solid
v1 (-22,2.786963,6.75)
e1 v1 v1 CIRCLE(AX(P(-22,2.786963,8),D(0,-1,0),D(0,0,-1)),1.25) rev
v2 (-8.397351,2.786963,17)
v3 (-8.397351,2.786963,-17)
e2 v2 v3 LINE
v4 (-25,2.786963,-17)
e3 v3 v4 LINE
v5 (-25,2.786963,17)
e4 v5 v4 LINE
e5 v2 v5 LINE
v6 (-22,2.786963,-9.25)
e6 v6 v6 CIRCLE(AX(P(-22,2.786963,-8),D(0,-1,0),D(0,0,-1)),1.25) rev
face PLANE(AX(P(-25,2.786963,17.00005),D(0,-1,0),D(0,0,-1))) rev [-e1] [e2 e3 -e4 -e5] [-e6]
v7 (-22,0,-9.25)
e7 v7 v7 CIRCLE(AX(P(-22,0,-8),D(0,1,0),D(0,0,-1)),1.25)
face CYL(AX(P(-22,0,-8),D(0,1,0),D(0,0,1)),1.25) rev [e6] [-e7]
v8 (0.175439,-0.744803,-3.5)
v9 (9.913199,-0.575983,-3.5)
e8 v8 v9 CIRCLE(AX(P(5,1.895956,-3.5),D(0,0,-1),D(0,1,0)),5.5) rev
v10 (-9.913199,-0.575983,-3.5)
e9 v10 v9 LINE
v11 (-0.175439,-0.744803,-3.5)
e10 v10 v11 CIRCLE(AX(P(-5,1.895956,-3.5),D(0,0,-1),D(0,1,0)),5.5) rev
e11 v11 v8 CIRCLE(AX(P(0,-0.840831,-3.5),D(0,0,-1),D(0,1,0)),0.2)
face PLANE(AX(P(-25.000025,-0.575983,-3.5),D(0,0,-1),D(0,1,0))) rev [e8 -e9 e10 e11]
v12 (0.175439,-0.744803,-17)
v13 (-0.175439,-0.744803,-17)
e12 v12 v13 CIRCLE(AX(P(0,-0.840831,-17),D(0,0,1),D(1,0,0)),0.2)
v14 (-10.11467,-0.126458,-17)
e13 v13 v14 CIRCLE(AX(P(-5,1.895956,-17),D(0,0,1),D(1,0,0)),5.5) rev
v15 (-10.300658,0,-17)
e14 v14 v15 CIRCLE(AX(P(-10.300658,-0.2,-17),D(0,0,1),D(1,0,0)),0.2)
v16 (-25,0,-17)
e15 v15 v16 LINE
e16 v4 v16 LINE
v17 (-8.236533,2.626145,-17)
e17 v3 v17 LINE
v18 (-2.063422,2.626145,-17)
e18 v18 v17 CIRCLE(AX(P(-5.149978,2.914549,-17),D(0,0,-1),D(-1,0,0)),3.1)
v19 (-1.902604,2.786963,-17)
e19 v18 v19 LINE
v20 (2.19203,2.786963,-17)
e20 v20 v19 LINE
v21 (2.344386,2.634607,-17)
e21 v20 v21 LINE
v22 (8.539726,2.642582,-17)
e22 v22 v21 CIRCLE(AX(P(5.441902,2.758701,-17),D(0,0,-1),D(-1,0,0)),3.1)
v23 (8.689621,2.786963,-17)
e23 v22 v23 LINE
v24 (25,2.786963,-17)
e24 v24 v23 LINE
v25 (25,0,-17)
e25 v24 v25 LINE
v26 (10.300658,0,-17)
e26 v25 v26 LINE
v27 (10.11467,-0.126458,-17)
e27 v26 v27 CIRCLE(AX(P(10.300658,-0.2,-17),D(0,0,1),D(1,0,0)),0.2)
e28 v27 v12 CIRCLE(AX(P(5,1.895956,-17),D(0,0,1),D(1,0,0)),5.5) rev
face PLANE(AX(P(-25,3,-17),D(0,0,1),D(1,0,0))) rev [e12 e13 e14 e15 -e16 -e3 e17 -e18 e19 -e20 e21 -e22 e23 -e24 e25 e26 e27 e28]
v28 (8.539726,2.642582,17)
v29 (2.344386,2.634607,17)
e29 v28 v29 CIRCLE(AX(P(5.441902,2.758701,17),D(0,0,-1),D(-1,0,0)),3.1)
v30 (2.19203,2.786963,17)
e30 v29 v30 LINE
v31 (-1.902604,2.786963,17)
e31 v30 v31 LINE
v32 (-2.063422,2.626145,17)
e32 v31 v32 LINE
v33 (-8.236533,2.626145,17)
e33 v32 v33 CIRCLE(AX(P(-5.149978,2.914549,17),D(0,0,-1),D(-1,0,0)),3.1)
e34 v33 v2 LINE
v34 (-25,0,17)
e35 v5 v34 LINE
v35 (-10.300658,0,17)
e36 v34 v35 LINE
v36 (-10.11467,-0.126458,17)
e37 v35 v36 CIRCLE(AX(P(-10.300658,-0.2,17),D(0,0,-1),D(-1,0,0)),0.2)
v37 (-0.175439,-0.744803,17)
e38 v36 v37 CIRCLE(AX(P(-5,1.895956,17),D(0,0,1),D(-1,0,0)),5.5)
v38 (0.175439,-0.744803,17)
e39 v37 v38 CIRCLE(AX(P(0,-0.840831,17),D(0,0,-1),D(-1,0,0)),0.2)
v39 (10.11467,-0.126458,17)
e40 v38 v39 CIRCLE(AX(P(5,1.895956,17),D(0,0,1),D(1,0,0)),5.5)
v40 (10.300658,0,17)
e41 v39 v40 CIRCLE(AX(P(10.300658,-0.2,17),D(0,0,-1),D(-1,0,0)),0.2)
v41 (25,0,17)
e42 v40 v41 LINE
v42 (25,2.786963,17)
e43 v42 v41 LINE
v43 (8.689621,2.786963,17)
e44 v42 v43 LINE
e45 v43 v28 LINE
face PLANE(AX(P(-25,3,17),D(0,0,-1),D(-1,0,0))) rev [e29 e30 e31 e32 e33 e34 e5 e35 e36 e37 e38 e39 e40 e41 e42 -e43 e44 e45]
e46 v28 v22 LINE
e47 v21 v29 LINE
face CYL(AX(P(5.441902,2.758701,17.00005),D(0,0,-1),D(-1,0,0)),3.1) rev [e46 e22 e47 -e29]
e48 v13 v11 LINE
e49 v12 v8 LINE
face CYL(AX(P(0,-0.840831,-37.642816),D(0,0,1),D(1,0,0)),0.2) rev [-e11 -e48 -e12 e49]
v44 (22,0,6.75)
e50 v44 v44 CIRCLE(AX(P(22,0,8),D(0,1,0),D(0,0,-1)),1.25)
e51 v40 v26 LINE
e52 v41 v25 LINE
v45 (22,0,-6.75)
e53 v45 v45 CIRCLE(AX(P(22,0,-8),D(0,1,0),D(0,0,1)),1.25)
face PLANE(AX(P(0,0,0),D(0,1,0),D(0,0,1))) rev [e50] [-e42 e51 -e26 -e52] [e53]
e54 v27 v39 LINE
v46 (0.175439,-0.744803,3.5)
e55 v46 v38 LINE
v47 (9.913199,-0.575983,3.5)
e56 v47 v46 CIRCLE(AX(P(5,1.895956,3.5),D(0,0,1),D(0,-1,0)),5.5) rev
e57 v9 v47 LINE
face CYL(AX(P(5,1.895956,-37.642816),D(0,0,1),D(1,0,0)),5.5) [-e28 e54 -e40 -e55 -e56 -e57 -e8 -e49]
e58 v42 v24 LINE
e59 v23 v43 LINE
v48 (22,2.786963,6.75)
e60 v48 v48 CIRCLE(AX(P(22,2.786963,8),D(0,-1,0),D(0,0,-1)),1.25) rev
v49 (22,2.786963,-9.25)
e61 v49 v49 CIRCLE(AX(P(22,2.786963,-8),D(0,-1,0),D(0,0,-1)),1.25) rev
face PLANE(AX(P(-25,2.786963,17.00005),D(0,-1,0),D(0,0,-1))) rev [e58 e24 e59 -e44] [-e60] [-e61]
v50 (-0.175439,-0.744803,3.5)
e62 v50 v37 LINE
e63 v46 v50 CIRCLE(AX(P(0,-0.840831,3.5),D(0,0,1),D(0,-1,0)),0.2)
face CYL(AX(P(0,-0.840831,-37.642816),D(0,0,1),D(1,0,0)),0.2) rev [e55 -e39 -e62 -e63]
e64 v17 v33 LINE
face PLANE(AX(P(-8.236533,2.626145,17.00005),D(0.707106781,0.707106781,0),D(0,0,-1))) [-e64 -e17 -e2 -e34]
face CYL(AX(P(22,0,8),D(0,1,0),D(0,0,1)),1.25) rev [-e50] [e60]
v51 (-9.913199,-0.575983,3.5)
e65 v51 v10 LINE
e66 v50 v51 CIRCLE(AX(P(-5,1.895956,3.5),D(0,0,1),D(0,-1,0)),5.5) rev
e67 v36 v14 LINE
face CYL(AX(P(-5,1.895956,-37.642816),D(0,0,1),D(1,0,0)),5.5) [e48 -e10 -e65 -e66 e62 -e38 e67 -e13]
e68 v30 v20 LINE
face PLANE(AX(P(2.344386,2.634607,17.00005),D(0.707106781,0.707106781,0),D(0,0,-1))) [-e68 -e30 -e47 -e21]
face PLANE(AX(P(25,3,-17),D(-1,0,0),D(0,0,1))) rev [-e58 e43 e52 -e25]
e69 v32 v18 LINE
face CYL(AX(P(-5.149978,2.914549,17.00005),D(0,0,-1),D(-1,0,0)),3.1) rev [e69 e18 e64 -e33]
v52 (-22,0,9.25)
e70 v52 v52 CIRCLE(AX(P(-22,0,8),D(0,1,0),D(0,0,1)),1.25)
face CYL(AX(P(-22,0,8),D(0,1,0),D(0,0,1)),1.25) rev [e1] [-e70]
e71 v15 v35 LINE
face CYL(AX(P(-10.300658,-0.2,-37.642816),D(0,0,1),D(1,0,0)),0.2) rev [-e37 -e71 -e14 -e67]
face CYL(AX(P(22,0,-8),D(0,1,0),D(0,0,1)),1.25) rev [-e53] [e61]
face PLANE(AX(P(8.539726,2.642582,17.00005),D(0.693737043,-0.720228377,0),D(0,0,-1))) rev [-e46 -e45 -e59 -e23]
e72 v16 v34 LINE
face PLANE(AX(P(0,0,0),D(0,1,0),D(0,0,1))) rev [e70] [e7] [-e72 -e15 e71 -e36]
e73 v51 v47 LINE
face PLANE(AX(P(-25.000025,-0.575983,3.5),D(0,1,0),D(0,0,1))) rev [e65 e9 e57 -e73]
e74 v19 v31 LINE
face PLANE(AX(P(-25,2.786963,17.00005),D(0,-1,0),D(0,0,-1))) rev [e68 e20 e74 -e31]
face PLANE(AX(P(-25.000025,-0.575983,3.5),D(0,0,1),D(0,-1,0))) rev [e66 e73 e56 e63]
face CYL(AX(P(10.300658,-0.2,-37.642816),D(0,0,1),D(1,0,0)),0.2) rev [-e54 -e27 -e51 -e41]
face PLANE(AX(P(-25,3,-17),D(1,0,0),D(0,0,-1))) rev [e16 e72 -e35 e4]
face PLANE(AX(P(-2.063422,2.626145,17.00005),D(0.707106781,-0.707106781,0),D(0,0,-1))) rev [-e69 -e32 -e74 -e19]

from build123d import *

# Parameters (mm, degrees)
SKETCH1_W           = 50
SKETCH1_H           = 34
BOSS_EXTRUDE1_DEPTH = 3
SKETCH2_W           = 38
SKETCH2_H           = 34
BOSS_EXTRUDE2_DEPTH = 3
SKETCH3_R           = 1.25
CUT_EXTRUDE1_DEPTH  = 3
BOSS_EXTRUDE3_DEPTH = 34
CUT_EXTRUDE4_DEPTH  = 43.626282972
SKETCH6_W           = 7
SKETCH6_H           = 4.004114793
CUT_EXTRUDE3_DEPTH  = 54.150729064
FILLET1_R           = 0.2
SKETCH8_W           = 4.910344877
SKETCH8_H           = 2.364797993
CUT_EXTRUDE5_DEPTH  = 43.626282972
FILLET2_R           = 0.5
SKETCH9_W           = 50
SKETCH9_H           = 6.499651724
CUT_EXTRUDE6_DEPTH  = 43.626282972
CHAMFER1_START      = -18
CHAMFER1_DEPTH      = 36


with BuildPart() as part:
    # Sketch1 → Boss-Extrude1 (new body)
    with BuildSketch(Plane(origin=(0, 0, 0), x_dir=(1, 0, 0), z_dir=(0, 1, 0))):
        Rectangle(SKETCH1_W, SKETCH1_H)
    extrude(amount=BOSS_EXTRUDE1_DEPTH)

    # Sketch2 → Boss-Extrude2 (add)
    with BuildSketch(Plane(origin=(0, 3, 0), x_dir=(1, 0, 0), z_dir=(0, 1, 0))):
        Rectangle(SKETCH2_W, SKETCH2_H)
    extrude(amount=BOSS_EXTRUDE2_DEPTH)

    # Sketch3 → Cut-Extrude1 (cut)
    with BuildSketch(Plane(origin=(0, 3, 0), x_dir=(1, 0, 0), z_dir=(0, 1, 0))):
        with Locations(Location((22, 8, 0), (0, 0, 270))):
            Circle(SKETCH3_R)
        with Locations(Location((22, -8, 0), (0, 0, 90))):
            Circle(SKETCH3_R)
        with Locations(Location((-22, -8, 0), (0, 0, 270))):
            Circle(SKETCH3_R)
        with Locations(Location((-22, 8, 0), (0, 0, 90))):
            Circle(SKETCH3_R)
    extrude(amount=-CUT_EXTRUDE1_DEPTH, mode=Mode.SUBTRACT)

    # Sketch5 → Boss-Extrude3 (add)
    with BuildSketch(Plane.XY.offset(17)):
        with BuildLine():
            Line((10.162882175, 0), (-10.162882175, 0))
            ThreePointArc((-10.162882175, 0), (-5.40902103, -3.588814383), (-0.175438596, -0.74480324))
            ThreePointArc((-0.175438596, -0.74480324), (0, -0.640830834), (0.175438596, -0.74480324))
            ThreePointArc((0.175438596, -0.74480324), (5.40902103, -3.588814383), (10.162882175, 0))
        make_face()
    extrude(amount=-BOSS_EXTRUDE3_DEPTH)

    # Sketch7 → Cut-Extrude4 (cut, through all)
    with BuildSketch(Plane(origin=(0, 0, -17), x_dir=(-1, 0, 0), z_dir=(0, 0, -1))):
        with BuildLine():
            Line((-8.541784002, 2.785692228), (-8.541784002, 8.770064047))
            Line((-8.541784002, 8.770064047), (8.249387021, 8.770064047))
            Line((8.249387021, 8.770064047), (8.249387021, 2.975059658))
            ThreePointArc((8.249387021, 2.975059658), (5.18491916, -0.185254174), (2.049991811, 2.905179016))
            Line((2.049991811, 2.905179016), (2.049991811, 5.195476311))
            Line((2.049991811, 5.195476311), (-2.343419325, 5.195476311))
            Line((-2.343419325, 5.195476311), (-2.343419325, 2.855696601))
            ThreePointArc((-2.343419325, 2.855696601), (-5.40689232, -0.341101373), (-8.541784002, 2.785692228))
        make_face()
    extrude(amount=-CUT_EXTRUDE4_DEPTH, mode=Mode.SUBTRACT)

    # Sketch6 → Cut-Extrude3 (cut, through all)
    with BuildSketch(Plane(origin=(25, 0, 0), x_dir=(0, 0, -1), z_dir=(1, 0, 0))):
        with Locations((0, -2.578040121)):
            Rectangle(SKETCH6_W, SKETCH6_H)
    extrude(amount=-CUT_EXTRUDE3_DEPTH, mode=Mode.SUBTRACT)

    # Fillet1
    fillet1_edges = [part.edges().sort_by_distance(p)[0] for p in [
        (10.162882175, 0, 0),
        (-10.162882175, 0, 0),
    ]]
    fillet(fillet1_edges, radius=FILLET1_R)

    # Sketch8 → Cut-Extrude5 (cut, through all)
    with BuildSketch(Plane(origin=(0, 0, -17), x_dir=(-1, 0, 0), z_dir=(0, 0, -1))):
        with Locations((-0.118869912, 4.00385134)):
            Rectangle(SKETCH8_W, SKETCH8_H)
    extrude(amount=-CUT_EXTRUDE5_DEPTH, mode=Mode.SUBTRACT)


with BuildPart() as cut_extrude5_kept_piece:
    # of the separate pieces the step leaves, the one the design keeps (cut_extrude5_pieces_kept)
    add(part.part.solids().sort_by_distance((-10.300657517, 0, -17))[0])

    # Fillet2
    fillet2_edges = [cut_extrude5_kept_piece.edges().sort_by_distance(p)[0] for p in [
        (8.541784002, 6, 0),
        (-8.249387021, 6, 0),
    ]]
    fillet(fillet2_edges, radius=FILLET2_R)

    # Sketch9 → Cut-Extrude6 (cut, through all)
    with BuildSketch(Plane(origin=(0, 0, -17), x_dir=(-1, 0, 0), z_dir=(0, 0, -1))):
        with Locations((0, 6.036788854)):
            Rectangle(SKETCH9_W, SKETCH9_H)
    extrude(amount=-CUT_EXTRUDE6_DEPTH, mode=Mode.SUBTRACT)

    # Chamfer1: read off the stored shape, not the designer's step
    # Chamfer1 outline → Chamfer1 (cut)
    with BuildSketch(Plane.XY.offset(CHAMFER1_START)):
        with BuildLine():
            ThreePointArc((8.541784002, 2.785692228), (8.541581007, 2.714125068), (8.539725958, 2.642581666))
            Line((8.539725958, 2.642581666), (8.689620689, 2.786962992))
            Line((8.689620689, 2.786962992), (8.541784002, 2.786962992))
            Line((8.541784002, 2.786962992), (8.541784002, 2.785692228))
        make_face()
        with BuildLine():
            Line((2.342030341, 2.786962992), (2.192030341, 2.786962992))
            Line((2.192030341, 2.786962992), (2.344386261, 2.634607072))
            ThreePointArc((2.344386261, 2.634607072), (2.342272067, 2.710770555), (2.342030341, 2.786962992))
        make_face()
        with BuildLine():
            ThreePointArc((-2.052604274, 2.786962992), (-2.05696798, 2.706483589), (-2.063422436, 2.62614483))
            Line((-2.063422436, 2.62614483), (-1.902604274, 2.786962992))
            Line((-1.902604274, 2.786962992), (-2.052604274, 2.786962992))
        make_face()
        with BuildLine():
            Line((-8.397351028, 2.786962992), (-8.236532866, 2.62614483))
            ThreePointArc((-8.236532866, 2.62614483), (-8.242987322, 2.706483589), (-8.247351028, 2.786962992))
            Line((-8.247351028, 2.786962992), (-8.397351028, 2.786962992))
        make_face()
    extrude(amount=CHAMFER1_DEPTH, mode=Mode.SUBTRACT)


solid = cut_extrude5_kept_piece.part
